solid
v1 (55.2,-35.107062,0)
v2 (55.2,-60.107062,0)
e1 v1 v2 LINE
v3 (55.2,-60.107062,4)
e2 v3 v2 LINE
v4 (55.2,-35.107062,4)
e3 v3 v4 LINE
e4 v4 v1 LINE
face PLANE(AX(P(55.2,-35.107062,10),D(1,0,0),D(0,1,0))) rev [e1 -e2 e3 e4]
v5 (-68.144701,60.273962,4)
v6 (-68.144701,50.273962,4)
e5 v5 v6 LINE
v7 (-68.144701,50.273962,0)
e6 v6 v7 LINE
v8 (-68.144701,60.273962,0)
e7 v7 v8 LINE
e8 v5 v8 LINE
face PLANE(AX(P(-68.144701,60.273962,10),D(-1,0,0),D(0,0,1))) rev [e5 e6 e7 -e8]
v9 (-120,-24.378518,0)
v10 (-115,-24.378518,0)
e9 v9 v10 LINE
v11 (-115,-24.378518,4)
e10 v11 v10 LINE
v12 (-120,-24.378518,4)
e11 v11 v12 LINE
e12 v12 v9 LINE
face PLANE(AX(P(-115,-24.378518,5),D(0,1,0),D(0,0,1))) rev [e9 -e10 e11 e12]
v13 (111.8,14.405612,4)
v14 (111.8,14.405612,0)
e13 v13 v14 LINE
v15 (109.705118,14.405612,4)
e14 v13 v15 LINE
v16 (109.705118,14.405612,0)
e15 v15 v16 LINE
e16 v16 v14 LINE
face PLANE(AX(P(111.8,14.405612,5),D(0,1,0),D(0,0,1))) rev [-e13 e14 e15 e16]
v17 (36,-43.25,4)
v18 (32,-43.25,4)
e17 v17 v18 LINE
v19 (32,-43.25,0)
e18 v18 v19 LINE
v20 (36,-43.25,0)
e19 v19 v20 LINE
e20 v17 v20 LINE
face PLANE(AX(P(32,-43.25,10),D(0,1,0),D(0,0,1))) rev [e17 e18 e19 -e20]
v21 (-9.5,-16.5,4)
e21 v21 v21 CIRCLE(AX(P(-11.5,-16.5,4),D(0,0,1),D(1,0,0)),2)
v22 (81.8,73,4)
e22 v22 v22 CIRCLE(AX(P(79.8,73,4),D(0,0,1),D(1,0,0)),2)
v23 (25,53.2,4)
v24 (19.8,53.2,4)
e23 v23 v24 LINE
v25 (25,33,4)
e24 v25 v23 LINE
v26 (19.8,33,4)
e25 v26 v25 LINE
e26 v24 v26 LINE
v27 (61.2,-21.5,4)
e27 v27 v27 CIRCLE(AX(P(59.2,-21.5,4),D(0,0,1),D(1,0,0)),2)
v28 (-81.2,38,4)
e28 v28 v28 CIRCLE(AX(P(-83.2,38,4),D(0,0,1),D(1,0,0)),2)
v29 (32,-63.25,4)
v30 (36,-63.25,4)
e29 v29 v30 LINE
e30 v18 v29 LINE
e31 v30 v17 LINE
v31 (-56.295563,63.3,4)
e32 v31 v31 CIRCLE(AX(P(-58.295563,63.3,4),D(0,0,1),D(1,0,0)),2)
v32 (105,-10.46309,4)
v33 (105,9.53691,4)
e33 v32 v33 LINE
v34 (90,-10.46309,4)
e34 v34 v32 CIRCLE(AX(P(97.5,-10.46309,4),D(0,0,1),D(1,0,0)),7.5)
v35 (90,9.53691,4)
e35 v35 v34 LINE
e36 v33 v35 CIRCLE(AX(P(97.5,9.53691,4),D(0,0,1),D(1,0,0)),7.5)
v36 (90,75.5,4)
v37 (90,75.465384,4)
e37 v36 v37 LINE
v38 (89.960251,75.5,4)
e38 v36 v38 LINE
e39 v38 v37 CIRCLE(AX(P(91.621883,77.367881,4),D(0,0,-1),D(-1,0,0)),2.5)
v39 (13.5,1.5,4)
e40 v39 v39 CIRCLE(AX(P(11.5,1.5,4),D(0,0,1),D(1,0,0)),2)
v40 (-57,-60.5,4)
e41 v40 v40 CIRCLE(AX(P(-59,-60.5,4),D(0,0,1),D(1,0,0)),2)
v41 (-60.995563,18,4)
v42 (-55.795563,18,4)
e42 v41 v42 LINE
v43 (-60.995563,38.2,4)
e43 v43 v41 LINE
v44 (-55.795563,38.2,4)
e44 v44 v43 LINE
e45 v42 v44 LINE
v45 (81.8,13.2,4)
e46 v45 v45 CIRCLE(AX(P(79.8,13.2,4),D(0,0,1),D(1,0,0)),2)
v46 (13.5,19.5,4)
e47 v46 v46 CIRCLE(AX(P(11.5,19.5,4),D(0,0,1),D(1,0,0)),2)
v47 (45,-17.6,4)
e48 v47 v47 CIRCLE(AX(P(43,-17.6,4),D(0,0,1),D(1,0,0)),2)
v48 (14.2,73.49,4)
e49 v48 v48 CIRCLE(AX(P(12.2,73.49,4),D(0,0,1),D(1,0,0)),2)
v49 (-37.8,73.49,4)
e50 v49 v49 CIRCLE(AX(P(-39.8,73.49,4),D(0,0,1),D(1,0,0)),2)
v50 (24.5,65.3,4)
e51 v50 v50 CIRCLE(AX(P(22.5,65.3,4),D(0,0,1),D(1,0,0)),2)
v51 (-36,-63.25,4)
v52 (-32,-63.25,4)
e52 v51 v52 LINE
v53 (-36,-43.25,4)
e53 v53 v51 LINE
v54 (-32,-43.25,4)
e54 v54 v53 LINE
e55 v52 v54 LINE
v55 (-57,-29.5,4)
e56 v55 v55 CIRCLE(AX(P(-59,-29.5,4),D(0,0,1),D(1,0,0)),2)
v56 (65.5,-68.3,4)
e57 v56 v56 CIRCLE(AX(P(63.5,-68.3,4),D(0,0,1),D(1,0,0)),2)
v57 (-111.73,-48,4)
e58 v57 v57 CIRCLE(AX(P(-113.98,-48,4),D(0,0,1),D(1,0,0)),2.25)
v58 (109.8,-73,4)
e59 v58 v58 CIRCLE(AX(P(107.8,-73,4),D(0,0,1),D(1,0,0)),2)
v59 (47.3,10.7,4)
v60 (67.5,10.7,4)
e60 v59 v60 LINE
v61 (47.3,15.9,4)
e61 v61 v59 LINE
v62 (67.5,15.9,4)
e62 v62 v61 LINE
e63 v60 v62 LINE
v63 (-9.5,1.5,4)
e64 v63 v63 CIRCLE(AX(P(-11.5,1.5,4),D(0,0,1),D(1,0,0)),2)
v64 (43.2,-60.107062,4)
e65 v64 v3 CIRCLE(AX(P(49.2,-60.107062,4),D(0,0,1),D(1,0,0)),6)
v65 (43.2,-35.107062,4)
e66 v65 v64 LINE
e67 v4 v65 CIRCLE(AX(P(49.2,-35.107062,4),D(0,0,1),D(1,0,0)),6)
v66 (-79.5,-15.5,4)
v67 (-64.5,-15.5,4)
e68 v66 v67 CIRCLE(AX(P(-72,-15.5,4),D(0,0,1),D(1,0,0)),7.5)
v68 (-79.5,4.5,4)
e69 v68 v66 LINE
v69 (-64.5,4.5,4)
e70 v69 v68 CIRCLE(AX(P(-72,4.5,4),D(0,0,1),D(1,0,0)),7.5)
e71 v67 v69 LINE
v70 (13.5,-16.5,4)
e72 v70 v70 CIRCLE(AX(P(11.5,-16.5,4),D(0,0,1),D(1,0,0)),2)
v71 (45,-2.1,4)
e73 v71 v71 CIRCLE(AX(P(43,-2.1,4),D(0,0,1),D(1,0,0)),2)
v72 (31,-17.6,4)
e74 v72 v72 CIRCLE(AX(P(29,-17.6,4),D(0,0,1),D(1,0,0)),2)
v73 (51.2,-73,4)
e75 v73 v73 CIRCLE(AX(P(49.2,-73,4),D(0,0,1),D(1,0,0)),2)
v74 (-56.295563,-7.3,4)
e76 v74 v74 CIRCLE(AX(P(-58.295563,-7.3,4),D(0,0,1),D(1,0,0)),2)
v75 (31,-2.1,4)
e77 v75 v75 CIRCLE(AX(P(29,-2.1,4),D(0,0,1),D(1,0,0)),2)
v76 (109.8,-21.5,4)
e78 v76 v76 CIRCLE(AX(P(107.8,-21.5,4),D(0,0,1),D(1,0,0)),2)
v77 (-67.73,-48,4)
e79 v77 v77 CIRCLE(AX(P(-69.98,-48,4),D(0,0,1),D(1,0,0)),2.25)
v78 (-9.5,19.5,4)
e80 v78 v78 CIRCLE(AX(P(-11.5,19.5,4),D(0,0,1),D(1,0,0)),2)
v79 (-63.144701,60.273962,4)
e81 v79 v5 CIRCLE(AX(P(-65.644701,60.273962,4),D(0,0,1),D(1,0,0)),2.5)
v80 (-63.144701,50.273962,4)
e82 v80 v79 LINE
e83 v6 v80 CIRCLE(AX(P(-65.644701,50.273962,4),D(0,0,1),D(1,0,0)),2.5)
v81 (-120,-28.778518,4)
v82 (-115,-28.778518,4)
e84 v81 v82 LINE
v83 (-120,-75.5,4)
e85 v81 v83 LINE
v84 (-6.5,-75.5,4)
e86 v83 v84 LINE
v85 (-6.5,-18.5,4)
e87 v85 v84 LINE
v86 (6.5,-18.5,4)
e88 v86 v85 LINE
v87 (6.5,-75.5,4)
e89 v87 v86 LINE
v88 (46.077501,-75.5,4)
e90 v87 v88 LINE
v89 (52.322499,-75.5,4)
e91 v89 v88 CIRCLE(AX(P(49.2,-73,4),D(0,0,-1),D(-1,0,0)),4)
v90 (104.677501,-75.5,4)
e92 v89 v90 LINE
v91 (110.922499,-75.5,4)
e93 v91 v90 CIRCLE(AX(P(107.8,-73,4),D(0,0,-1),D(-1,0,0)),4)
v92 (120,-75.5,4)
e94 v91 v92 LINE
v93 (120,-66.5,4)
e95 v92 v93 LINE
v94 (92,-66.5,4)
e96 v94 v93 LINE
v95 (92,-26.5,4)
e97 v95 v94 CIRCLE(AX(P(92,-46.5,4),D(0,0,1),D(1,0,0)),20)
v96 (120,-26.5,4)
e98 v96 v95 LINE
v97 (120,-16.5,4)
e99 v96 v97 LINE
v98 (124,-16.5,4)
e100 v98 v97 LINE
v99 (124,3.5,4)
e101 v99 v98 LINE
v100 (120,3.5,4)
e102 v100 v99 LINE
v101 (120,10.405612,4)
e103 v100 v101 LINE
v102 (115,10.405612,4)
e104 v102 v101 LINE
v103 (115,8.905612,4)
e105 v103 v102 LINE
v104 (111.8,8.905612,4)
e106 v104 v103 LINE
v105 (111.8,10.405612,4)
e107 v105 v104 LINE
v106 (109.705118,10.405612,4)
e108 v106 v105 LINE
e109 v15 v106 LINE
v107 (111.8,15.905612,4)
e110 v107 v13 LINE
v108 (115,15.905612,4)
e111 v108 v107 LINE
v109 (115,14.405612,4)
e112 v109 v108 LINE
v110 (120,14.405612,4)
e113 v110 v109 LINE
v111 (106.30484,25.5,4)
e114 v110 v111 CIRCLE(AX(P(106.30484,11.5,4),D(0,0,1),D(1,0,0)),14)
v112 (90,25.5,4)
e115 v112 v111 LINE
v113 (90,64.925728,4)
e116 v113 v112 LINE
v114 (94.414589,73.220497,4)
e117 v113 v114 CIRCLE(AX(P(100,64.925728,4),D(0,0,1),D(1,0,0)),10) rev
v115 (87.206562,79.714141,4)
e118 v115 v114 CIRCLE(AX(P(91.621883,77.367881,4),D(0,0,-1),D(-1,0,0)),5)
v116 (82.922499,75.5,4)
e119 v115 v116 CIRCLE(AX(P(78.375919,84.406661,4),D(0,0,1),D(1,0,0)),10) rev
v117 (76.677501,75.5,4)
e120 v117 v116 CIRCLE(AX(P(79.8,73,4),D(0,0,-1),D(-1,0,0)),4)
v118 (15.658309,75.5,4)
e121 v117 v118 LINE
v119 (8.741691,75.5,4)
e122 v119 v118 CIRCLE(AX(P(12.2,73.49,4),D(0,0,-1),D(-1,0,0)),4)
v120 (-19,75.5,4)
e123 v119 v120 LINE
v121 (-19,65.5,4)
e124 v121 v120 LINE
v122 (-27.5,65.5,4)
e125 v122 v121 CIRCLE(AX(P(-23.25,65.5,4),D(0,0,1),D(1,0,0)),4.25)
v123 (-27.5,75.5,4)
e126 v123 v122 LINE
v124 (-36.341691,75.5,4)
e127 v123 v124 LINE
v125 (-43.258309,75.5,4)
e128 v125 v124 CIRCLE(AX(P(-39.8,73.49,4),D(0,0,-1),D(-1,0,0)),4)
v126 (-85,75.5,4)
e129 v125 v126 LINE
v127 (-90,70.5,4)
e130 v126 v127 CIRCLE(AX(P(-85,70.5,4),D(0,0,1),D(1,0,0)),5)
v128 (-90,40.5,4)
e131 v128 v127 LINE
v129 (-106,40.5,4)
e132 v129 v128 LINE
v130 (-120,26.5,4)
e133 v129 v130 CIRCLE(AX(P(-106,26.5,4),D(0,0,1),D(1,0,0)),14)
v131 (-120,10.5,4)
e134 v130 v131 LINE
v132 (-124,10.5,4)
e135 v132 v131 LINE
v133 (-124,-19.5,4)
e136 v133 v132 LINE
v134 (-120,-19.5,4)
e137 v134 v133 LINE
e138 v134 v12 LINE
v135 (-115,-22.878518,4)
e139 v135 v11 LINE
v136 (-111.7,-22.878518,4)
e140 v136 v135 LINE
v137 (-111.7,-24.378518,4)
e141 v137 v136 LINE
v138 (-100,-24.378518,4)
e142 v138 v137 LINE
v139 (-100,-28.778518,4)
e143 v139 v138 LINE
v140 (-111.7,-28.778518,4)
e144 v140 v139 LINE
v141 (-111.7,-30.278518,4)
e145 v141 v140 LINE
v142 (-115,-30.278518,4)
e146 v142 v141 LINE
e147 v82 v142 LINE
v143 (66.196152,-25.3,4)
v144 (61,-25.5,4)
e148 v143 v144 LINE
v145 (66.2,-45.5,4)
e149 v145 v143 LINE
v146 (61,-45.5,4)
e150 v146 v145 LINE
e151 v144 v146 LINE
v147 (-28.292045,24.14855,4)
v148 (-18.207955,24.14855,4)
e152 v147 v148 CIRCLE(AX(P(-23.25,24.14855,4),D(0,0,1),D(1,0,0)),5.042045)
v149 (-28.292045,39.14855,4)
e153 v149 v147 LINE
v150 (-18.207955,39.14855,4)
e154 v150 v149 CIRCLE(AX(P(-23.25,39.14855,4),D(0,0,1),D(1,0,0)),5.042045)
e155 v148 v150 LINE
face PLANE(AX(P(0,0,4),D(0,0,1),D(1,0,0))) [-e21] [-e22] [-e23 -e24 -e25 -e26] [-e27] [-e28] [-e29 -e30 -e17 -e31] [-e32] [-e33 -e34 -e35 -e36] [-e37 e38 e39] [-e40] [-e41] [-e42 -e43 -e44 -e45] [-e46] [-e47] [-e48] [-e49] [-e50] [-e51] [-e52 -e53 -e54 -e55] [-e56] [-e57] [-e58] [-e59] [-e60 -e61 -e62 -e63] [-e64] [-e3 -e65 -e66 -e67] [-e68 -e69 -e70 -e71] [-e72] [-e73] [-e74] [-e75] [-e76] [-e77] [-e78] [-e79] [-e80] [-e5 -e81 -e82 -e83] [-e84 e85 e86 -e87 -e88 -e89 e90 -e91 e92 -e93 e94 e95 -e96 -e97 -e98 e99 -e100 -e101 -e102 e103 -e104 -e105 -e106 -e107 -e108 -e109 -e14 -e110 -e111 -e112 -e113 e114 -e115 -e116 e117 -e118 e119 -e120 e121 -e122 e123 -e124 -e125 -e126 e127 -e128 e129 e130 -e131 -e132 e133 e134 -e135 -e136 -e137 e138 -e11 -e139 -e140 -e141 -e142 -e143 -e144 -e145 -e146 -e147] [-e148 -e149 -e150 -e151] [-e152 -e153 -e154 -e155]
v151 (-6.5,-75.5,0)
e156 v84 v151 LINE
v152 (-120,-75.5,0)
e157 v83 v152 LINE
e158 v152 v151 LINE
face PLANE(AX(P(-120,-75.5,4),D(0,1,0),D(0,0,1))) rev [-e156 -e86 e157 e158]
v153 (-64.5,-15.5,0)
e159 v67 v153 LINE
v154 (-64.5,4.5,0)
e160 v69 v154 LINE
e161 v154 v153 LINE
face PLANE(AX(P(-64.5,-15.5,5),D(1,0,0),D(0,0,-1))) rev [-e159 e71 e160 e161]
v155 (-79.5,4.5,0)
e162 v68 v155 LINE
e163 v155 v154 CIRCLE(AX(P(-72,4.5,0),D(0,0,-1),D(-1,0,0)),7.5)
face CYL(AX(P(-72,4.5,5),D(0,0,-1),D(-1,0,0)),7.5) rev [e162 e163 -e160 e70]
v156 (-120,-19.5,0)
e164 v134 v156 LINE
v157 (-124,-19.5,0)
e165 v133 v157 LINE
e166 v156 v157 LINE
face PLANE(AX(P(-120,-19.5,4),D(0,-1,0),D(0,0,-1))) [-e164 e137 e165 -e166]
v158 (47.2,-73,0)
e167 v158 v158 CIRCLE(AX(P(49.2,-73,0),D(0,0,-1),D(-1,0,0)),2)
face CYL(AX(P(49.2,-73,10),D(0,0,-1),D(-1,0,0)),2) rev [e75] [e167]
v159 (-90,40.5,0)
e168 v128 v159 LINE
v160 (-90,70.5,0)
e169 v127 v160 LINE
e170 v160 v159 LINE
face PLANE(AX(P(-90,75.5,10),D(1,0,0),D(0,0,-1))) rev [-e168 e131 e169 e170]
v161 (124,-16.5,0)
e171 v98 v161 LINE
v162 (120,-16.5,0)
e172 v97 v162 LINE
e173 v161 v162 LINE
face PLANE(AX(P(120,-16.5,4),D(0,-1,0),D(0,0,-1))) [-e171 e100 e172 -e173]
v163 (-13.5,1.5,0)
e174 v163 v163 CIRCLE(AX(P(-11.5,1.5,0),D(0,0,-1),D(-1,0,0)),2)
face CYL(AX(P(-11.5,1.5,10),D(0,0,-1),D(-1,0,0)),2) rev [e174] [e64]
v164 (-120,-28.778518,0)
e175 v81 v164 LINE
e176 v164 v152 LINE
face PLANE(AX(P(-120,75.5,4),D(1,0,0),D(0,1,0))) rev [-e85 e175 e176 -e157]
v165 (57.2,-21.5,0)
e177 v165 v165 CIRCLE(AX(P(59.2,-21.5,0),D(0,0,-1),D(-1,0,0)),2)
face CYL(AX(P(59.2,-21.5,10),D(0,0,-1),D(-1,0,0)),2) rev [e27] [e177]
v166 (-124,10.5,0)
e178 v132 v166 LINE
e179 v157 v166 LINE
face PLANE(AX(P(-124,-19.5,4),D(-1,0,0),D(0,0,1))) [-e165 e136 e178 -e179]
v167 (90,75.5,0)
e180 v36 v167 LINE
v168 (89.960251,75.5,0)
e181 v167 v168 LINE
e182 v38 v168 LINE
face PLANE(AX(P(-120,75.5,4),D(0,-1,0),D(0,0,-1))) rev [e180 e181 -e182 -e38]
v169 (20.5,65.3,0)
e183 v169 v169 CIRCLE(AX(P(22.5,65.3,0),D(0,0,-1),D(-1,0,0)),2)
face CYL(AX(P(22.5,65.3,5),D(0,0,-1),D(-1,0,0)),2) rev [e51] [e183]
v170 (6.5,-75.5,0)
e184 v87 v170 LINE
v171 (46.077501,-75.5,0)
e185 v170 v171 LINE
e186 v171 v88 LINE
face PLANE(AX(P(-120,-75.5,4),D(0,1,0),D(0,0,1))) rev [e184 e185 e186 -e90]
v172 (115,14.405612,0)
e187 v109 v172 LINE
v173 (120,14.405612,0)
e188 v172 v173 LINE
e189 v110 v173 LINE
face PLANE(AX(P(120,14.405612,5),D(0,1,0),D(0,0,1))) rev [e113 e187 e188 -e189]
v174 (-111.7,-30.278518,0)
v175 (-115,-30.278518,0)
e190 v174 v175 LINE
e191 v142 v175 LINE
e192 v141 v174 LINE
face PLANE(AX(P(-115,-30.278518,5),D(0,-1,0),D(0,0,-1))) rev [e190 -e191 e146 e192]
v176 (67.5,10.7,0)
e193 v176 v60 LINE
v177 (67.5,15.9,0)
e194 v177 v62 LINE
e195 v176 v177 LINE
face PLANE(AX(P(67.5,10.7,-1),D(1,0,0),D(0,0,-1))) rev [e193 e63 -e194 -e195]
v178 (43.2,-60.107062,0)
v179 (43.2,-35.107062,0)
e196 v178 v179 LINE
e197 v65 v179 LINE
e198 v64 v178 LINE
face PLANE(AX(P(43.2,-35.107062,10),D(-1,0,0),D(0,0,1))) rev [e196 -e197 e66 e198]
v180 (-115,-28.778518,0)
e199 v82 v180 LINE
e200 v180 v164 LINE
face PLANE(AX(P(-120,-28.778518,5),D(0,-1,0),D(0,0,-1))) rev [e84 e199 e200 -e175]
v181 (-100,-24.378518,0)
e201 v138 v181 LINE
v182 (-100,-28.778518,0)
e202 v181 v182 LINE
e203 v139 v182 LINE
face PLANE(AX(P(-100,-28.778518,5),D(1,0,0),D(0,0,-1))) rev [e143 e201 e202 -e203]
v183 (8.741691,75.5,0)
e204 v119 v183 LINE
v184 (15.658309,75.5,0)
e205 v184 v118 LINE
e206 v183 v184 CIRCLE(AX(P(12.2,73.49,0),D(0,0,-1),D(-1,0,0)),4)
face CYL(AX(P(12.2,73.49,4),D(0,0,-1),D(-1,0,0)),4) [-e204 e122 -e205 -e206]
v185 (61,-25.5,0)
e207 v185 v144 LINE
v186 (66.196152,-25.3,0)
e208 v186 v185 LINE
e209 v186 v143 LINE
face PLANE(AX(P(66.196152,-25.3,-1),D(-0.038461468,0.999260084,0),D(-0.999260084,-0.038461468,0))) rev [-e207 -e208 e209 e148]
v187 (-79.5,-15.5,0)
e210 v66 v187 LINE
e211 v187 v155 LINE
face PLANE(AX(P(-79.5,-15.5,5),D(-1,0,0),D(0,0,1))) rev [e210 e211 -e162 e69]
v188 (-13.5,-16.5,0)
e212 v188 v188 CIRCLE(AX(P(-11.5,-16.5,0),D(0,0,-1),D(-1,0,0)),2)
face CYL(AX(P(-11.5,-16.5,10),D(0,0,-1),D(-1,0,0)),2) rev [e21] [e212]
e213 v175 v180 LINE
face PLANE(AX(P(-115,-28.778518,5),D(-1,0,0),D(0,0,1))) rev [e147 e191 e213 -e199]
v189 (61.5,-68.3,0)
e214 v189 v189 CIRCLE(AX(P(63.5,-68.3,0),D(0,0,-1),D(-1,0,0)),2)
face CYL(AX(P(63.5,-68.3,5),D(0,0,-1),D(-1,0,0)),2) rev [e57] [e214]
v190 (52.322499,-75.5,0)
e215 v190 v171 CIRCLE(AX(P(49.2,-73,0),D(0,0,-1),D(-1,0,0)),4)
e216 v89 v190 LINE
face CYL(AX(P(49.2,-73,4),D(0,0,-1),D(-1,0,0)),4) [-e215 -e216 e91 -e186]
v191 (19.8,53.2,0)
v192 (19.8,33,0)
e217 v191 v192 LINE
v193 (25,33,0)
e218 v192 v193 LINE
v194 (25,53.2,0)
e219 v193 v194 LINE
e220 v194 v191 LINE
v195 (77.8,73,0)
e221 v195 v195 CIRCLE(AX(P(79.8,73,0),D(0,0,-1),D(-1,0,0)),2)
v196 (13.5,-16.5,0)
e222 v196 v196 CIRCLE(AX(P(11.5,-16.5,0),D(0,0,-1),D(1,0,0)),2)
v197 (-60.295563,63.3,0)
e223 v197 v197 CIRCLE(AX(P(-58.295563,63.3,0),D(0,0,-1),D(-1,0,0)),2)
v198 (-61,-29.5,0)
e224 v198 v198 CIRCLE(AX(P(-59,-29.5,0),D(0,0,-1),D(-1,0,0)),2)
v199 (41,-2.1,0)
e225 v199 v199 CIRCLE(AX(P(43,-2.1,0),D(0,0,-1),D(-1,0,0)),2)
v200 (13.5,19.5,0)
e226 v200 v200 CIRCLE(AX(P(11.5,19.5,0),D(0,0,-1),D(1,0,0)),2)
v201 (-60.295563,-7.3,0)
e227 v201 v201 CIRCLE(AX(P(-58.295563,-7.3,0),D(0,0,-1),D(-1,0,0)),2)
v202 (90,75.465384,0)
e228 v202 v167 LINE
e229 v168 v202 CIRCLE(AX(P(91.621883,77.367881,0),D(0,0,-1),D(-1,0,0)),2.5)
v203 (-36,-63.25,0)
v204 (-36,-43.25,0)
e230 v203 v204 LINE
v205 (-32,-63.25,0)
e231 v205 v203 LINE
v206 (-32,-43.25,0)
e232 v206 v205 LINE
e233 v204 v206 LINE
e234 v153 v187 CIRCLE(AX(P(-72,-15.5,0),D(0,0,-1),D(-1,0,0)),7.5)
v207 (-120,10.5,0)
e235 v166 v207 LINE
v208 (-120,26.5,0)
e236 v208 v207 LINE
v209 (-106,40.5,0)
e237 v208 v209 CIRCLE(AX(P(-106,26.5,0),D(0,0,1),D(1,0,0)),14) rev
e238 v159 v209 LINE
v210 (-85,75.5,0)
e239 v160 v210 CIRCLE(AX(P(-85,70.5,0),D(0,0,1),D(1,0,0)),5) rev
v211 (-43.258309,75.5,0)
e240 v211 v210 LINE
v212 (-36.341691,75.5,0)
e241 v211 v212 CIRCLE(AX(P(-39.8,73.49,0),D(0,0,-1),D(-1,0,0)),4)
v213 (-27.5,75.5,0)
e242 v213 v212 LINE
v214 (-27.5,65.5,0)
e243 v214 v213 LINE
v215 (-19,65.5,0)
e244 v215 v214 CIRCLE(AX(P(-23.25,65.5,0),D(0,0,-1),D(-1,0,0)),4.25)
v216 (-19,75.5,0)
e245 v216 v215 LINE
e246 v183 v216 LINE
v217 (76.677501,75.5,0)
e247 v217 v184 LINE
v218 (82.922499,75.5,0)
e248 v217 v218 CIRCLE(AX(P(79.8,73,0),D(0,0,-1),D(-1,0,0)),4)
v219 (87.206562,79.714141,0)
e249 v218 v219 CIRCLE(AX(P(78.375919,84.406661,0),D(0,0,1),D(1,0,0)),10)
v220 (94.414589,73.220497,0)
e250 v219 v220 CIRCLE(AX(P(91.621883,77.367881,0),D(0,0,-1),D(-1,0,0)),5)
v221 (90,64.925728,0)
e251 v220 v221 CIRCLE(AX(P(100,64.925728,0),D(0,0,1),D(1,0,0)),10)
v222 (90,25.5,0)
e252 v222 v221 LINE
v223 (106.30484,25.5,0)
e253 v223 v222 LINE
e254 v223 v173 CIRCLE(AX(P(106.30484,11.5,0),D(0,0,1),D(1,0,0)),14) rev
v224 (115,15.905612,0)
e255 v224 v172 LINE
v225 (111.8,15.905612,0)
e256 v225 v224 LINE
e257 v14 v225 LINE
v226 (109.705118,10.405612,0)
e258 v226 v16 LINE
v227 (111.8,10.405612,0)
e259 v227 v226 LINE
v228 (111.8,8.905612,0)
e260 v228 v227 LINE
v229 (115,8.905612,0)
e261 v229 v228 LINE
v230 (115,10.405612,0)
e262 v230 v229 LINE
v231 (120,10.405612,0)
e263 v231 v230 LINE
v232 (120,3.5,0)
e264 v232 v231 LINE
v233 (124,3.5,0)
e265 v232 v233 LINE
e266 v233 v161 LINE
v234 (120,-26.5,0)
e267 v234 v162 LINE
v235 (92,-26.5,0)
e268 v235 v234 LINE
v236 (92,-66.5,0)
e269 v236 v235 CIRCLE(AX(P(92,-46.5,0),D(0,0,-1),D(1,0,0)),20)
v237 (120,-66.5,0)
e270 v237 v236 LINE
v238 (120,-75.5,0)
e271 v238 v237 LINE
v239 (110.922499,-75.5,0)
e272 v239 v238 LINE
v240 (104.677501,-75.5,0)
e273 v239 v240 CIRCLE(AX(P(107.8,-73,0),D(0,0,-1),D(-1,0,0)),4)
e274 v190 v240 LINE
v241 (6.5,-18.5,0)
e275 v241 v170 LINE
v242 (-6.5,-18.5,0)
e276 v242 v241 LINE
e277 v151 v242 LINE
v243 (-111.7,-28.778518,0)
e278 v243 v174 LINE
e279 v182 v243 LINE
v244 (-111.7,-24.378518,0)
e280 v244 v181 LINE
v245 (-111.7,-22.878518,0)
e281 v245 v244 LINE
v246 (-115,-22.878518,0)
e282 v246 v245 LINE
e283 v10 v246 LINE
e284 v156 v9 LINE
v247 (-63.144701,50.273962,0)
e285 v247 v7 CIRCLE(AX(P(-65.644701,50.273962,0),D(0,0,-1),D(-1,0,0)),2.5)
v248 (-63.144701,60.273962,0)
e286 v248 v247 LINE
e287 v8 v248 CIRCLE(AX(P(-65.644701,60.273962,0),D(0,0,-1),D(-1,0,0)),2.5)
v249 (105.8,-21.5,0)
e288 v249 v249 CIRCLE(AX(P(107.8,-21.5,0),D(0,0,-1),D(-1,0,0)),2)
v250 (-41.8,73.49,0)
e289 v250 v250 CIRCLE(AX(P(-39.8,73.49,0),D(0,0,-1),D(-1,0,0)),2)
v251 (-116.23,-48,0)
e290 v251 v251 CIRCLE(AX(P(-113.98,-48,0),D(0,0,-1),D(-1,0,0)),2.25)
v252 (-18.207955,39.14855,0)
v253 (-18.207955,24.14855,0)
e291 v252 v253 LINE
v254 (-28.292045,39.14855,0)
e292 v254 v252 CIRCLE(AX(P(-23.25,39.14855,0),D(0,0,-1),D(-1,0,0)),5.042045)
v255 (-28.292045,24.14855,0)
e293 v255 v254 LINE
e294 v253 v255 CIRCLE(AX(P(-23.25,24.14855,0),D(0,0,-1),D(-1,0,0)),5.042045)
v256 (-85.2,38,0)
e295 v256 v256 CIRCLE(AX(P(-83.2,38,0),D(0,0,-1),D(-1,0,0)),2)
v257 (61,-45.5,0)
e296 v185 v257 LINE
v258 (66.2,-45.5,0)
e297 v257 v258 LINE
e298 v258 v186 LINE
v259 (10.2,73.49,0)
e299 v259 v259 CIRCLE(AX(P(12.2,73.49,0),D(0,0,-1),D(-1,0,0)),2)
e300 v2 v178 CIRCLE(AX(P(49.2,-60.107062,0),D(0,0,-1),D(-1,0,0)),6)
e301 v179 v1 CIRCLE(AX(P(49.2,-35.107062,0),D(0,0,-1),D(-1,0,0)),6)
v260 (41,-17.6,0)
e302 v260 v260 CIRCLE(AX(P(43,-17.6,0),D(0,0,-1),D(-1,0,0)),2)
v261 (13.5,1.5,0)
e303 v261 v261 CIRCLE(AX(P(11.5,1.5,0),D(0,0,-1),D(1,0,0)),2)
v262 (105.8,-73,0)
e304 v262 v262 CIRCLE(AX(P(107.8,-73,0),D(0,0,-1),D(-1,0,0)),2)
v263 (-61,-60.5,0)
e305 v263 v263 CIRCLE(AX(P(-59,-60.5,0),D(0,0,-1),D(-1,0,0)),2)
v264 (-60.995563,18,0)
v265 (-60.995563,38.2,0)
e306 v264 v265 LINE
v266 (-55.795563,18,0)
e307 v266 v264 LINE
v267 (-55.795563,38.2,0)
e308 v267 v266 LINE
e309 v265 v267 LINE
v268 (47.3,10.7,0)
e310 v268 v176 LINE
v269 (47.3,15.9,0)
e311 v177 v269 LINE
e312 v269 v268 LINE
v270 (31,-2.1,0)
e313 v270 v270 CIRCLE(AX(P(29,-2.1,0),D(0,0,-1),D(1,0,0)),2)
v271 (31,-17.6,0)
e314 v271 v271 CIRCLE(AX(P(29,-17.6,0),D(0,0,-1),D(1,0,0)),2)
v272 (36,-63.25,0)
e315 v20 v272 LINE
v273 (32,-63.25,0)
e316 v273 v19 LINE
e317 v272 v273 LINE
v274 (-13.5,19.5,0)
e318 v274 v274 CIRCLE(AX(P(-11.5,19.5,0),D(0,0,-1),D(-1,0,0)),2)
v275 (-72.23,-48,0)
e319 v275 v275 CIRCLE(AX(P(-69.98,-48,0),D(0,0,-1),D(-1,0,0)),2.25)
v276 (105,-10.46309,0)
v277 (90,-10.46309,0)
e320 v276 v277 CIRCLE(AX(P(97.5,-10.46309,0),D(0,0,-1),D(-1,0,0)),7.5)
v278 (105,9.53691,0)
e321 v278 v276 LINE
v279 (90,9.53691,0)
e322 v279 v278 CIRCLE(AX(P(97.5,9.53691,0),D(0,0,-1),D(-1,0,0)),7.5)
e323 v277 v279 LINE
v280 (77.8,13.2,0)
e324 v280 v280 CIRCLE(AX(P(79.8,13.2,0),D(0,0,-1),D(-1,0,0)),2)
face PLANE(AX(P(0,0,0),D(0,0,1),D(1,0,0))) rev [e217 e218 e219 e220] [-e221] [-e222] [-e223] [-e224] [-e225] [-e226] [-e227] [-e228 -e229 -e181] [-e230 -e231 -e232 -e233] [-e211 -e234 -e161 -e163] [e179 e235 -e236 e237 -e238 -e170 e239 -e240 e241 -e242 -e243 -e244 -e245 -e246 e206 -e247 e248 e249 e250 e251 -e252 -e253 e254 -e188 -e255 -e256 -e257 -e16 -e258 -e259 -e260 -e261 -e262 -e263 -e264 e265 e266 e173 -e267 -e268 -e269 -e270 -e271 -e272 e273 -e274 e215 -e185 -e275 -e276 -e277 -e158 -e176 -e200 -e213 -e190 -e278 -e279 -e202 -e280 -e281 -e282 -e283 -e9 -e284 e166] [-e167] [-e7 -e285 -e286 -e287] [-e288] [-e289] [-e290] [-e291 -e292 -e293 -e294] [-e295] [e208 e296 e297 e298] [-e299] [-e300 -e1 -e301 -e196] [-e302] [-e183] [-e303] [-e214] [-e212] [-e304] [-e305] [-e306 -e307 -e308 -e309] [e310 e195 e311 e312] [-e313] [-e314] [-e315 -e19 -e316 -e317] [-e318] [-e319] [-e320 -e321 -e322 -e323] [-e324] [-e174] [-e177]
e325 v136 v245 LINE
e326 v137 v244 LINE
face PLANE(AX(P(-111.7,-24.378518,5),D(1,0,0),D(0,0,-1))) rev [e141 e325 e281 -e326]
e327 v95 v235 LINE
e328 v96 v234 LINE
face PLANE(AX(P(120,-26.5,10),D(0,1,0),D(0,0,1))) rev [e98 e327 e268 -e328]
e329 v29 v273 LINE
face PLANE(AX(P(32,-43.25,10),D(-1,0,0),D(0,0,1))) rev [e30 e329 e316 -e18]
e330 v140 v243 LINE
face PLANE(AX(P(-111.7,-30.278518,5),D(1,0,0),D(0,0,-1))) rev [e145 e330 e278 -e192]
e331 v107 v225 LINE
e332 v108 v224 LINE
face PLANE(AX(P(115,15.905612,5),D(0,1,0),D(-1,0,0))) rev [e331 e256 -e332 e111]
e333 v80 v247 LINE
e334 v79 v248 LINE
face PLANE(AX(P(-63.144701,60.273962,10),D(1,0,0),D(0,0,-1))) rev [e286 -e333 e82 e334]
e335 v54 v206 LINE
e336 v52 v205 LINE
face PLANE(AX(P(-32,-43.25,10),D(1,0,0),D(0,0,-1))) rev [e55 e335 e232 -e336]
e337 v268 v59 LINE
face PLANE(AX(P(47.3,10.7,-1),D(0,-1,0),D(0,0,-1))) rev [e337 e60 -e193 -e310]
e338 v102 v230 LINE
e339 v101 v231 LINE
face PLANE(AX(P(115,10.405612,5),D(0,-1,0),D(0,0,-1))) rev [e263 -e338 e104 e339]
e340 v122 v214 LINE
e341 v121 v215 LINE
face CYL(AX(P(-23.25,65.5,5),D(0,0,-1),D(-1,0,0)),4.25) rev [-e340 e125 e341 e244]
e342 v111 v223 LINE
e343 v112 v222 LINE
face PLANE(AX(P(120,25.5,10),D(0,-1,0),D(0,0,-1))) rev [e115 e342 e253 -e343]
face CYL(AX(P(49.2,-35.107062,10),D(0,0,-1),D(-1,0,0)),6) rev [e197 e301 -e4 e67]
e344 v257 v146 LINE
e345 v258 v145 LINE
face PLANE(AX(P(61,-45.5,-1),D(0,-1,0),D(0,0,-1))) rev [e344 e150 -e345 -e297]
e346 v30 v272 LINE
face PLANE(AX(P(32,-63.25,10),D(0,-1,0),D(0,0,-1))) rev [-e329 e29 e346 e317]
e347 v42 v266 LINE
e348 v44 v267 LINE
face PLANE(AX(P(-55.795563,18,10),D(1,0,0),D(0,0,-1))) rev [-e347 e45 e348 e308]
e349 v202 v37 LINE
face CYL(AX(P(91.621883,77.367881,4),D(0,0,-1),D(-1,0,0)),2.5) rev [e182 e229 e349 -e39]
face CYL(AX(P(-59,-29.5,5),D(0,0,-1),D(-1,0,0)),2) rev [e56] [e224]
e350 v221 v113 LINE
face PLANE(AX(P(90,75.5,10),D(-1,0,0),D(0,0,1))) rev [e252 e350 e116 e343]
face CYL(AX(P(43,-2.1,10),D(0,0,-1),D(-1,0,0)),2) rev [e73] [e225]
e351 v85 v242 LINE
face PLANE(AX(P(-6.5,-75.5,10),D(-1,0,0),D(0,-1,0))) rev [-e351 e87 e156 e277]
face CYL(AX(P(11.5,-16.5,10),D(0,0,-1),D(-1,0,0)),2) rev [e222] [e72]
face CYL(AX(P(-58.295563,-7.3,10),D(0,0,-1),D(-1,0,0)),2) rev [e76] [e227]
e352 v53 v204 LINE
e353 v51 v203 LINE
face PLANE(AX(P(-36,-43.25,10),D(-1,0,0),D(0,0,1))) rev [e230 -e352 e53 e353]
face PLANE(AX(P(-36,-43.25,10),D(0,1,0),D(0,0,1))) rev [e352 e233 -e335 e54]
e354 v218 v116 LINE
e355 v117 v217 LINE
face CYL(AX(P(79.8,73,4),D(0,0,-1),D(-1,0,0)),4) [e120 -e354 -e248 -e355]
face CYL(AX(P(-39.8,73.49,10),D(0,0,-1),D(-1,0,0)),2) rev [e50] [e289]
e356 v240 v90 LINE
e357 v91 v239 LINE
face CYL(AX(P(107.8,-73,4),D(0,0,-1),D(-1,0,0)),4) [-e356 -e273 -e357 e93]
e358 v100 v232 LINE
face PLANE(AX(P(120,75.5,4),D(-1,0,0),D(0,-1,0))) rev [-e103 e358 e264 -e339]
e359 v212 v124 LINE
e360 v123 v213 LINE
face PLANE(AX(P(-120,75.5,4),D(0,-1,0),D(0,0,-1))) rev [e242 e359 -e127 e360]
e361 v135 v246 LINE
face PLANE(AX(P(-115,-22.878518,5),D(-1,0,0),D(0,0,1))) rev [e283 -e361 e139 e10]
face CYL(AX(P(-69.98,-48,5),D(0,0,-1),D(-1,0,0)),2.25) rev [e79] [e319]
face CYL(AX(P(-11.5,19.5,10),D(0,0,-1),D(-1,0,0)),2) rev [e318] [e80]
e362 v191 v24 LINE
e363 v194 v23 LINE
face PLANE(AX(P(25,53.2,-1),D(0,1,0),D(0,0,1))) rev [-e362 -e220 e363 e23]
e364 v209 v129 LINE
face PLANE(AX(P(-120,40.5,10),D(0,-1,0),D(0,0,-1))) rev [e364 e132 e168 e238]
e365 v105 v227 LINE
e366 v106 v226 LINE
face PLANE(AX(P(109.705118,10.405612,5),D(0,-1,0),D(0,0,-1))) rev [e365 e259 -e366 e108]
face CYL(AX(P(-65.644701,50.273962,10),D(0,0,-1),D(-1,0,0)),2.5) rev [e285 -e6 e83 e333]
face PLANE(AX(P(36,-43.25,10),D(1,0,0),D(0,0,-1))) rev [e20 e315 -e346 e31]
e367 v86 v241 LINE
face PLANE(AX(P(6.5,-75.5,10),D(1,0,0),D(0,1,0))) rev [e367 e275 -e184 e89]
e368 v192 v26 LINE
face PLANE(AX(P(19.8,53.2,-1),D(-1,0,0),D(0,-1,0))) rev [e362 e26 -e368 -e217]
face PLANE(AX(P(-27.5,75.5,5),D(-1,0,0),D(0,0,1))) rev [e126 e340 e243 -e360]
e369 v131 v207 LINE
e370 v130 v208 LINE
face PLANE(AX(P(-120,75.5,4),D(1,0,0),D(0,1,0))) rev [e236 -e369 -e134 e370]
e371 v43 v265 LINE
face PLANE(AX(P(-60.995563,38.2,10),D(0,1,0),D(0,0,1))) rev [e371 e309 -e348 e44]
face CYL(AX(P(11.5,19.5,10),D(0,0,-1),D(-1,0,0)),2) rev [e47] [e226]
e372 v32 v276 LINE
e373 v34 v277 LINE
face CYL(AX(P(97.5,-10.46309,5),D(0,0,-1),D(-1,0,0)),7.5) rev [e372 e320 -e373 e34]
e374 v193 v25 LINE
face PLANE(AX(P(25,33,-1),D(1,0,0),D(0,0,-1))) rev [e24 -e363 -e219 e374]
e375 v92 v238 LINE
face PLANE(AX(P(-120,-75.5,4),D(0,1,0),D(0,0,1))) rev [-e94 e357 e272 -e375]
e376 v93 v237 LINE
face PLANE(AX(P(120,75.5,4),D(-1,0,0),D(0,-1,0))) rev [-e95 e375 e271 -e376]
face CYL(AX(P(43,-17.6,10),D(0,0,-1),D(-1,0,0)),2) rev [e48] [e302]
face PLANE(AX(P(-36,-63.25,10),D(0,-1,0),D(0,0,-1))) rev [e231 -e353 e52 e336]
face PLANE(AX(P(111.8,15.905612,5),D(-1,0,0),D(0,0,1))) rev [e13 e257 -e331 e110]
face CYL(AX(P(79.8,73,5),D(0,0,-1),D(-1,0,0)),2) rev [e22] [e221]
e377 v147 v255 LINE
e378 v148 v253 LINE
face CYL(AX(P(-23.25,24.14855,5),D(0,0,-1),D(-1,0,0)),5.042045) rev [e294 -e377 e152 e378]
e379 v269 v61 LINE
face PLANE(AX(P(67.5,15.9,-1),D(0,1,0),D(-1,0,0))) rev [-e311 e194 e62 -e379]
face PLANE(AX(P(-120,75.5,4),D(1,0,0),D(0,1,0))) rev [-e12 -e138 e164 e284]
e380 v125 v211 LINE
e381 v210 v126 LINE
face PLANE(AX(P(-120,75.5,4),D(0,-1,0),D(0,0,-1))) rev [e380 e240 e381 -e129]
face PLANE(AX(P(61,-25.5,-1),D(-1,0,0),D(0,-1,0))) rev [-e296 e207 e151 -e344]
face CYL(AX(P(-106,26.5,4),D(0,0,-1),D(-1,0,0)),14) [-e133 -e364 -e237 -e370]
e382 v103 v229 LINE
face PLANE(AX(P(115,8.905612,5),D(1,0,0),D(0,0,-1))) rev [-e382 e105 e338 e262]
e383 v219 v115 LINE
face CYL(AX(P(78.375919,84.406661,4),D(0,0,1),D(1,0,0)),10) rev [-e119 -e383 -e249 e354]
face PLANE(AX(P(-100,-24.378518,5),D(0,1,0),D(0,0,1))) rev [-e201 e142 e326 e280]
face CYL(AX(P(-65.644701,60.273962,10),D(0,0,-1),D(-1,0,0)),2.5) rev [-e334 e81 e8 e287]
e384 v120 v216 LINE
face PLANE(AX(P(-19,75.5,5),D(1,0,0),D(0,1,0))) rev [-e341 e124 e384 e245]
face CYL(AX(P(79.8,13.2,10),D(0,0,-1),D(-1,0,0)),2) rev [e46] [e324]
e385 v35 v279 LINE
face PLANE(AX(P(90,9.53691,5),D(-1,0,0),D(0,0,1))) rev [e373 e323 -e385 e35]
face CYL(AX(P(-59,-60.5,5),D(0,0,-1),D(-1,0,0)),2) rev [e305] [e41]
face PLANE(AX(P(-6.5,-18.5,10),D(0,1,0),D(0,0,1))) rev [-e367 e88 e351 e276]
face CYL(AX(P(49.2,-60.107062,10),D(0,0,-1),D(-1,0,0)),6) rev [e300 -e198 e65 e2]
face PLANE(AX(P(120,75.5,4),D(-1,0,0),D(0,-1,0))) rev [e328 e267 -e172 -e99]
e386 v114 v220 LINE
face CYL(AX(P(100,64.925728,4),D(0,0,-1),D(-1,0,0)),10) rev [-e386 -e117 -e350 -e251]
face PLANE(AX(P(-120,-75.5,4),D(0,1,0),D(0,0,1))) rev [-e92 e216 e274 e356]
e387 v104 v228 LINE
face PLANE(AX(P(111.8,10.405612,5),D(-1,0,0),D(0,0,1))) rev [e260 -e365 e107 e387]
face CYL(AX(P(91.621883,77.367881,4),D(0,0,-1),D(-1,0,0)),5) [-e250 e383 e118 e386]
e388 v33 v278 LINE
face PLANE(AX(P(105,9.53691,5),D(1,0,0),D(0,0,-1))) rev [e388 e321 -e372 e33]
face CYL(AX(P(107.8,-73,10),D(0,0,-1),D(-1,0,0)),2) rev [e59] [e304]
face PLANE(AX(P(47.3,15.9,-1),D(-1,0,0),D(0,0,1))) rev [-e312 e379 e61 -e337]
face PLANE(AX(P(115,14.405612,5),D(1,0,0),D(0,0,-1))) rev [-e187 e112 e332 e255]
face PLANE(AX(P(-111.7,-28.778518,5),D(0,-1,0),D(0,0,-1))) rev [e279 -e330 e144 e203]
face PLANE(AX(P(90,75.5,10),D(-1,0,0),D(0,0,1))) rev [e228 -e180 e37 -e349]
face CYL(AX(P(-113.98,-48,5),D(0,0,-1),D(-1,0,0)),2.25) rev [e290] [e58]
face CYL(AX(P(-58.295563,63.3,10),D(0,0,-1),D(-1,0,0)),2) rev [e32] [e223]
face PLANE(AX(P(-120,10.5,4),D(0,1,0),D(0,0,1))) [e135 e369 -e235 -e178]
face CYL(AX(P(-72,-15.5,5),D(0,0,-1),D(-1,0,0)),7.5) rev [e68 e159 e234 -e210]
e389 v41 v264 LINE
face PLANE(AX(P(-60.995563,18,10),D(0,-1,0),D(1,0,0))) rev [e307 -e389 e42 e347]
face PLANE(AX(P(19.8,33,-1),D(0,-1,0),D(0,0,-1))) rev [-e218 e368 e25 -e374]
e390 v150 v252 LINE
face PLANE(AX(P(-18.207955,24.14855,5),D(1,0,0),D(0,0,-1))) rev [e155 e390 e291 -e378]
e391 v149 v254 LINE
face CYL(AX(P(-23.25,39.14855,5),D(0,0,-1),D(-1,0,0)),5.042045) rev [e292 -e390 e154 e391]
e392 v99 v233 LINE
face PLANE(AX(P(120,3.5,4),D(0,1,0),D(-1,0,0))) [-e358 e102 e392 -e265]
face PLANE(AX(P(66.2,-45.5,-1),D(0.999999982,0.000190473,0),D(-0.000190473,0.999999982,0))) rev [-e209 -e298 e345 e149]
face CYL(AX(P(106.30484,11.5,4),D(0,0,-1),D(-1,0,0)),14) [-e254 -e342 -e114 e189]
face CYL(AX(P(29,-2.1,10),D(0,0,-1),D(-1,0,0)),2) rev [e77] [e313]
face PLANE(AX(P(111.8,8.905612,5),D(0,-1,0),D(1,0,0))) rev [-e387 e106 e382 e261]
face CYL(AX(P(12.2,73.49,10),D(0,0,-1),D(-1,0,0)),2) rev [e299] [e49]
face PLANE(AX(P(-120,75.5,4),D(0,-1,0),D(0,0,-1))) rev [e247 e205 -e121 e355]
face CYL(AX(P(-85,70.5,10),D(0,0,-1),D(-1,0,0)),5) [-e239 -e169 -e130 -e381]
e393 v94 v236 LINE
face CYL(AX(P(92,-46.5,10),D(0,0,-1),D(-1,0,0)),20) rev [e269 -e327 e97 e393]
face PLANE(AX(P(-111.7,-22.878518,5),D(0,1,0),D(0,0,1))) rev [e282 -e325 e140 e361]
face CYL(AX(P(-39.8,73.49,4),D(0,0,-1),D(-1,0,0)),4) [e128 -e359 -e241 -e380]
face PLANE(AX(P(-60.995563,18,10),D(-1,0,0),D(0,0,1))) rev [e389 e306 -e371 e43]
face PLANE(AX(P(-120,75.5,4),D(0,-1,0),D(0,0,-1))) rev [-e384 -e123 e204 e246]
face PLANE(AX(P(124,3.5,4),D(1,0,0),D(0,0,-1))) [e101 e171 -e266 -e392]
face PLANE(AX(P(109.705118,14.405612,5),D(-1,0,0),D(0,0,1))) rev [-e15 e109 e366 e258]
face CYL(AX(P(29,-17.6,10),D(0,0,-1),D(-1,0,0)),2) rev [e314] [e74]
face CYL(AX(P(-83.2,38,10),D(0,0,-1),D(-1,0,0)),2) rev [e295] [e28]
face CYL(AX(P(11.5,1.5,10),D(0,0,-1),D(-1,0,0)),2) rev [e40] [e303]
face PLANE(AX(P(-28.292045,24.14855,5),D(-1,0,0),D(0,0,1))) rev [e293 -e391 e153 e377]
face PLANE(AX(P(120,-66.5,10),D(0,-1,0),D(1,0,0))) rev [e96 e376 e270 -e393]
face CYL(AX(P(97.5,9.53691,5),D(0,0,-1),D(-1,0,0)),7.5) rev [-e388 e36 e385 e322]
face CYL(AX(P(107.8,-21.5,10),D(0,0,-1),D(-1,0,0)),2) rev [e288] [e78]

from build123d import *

# Parameters (mm, degrees)
SKETCH1_W           = 240
SKETCH1_H           = 151
BOSS_EXTRUDE1_DEPTH = 4
SKETCH3_W           = 13
SKETCH3_H           = 57
CUT_EXTRUDE2_DEPTH  = 10
SKETCH6_R           = 2
CUT_EXTRUDE5_DEPTH  = 10
SKETCH7_R           = 2
CUT_EXTRUDE6_DEPTH  = 10
CUT_EXTRUDE7_DEPTH  = 10
SKETCH9_R           = 2
CUT_EXTRUDE8_DEPTH  = 10
SKETCH10_R          = 4
SKETCH10_R_2        = 2
BOSS_EXTRUDE2_DEPTH = 4
CUT_EXTRUDE10_DEPTH = 10
SKETCH13_W          = 30
SKETCH13_H          = 35
CUT_EXTRUDE11_DEPTH = 10
SKETCH16_R          = 2
CUT_EXTRUDE13_DEPTH = 5
CUT_EXTRUDE14_DEPTH = 5
CUT_EXTRUDE15_DEPTH = 5
SKETCH20_W          = 5.2
SKETCH20_H          = 20.2
CUT_EXTRUDE17_DEPTH = 10
SKETCH21_R          = 2
CUT_EXTRUDE18_DEPTH = 10
CUT_EXTRUDE20_DEPTH = 5
SKETCH25_R          = 2
CUT_EXTRUDE21_DEPTH = 5
SKETCH26_R          = 2
CUT_EXTRUDE22_DEPTH = 10
SKETCH27_R          = 4
SKETCH27_R_2        = 2
BOSS_EXTRUDE4_DEPTH = 4
SKETCH28_W          = 5.2
SKETCH28_H          = 20.2
CUT_EXTRUDE23_DEPTH = 5
SKETCH29_W          = 20.2
SKETCH29_H          = 5.2
CUT_EXTRUDE24_DEPTH = 5
SKETCH30_R          = 2
CUT_EXTRUDE25_DEPTH = 5
SKETCH31_R          = 4
SKETCH31_R_2        = 2
BOSS_EXTRUDE5_DEPTH = 4
SKETCH33_W          = 4
SKETCH33_H          = 30
SKETCH33_H_2        = 20
BOSS_EXTRUDE6_DEPTH = 4
SKETCH34_R          = 2.25
CUT_EXTRUDE27_DEPTH = 5
CUT_EXTRUDE28_DEPTH = 5
SKETCH36_R          = 2
CUT_EXTRUDE29_DEPTH = 5
SKETCH37_R          = 2
CUT_EXTRUDE30_DEPTH = 10
SKETCH38_R          = 2
CUT_EXTRUDE31_DEPTH = 10
CUT_EXTRUDE32_DEPTH = 10
FILLET2_R           = 5
SKETCH41_R          = 5
SKETCH41_R_2        = 2.5
BOSS_EXTRUDE7_DEPTH = 4
FILLET3_R           = 10
CUT_EXTRUDE34_DEPTH = 5
FILLET4_R           = 14
SKETCH44_W          = 30
SKETCH44_H          = 15
CUT_EXTRUDE35_DEPTH = 10
FILLET5_R           = 14
SKETCH46_W          = 4
SKETCH46_H          = 20
CUT_EXTRUDE37_DEPTH = 10


with BuildPart() as part:
    # Sketch1 → Boss-Extrude1 (new body)
    with BuildSketch(Plane.XY):
        Rectangle(SKETCH1_W, SKETCH1_H)
    extrude(amount=BOSS_EXTRUDE1_DEPTH)

    # Sketch3 → Cut-Extrude2 (cut)
    with BuildSketch(Plane(origin=(0, 0, 0), x_dir=(-1, 0, 0), z_dir=(0, 0, -1))):
        with Locations((0, -47)):
            Rectangle(SKETCH3_W, SKETCH3_H)
    extrude(amount=-CUT_EXTRUDE2_DEPTH, mode=Mode.SUBTRACT)

    # Sketch6 → Cut-Extrude5 (cut)
    with BuildSketch(Plane(origin=(0, 0, 0), x_dir=(-1, 0, 0), z_dir=(0, 0, -1))):
        with Locations((11.5, 19.5)):
            Circle(SKETCH6_R)
        with Locations((11.5, 1.5)):
            Circle(SKETCH6_R)
        with Locations((11.5, -16.5)):
            Circle(SKETCH6_R)
        with Locations(Location((-11.5, -16.5, 0), (0, 0, 180))):
            Circle(SKETCH6_R)
        with Locations(Location((-11.5, 1.5, 0), (0, 0, 180))):
            Circle(SKETCH6_R)
        with Locations(Location((-11.5, 19.5, 0), (0, 0, 180))):
            Circle(SKETCH6_R)
    extrude(amount=-CUT_EXTRUDE5_DEPTH, mode=Mode.SUBTRACT)

    # Sketch7 → Cut-Extrude6 (cut)
    with BuildSketch(Plane(origin=(0, 0, 0), x_dir=(-1, 0, 0), z_dir=(0, 0, -1))):
        with Locations((-43, -2.1)):
            Circle(SKETCH7_R)
        with Locations((-43, -17.6)):
            Circle(SKETCH7_R)
        with Locations(Location((-29, -17.6, 0), (0, 0, 180))):
            Circle(SKETCH7_R)
        with Locations(Location((-29, -2.1, 0), (0, 0, 180))):
            Circle(SKETCH7_R)
    extrude(amount=-CUT_EXTRUDE6_DEPTH, mode=Mode.SUBTRACT)

    # Sketch8 → Cut-Extrude7 (cut)
    with BuildSketch(Plane(origin=(0, 0, 0), x_dir=(-1, 0, 0), z_dir=(0, 0, -1))):
        with BuildLine():
            Line((-120, -26.5), (-92, -26.5))
            ThreePointArc((-92, -26.5), (-72, -46.5), (-92, -66.5))
            Line((-92, -66.5), (-120, -66.5))
            Line((-120, -66.5), (-120, -26.5))
        make_face()
    extrude(amount=-CUT_EXTRUDE7_DEPTH, mode=Mode.SUBTRACT)

    # Sketch9 → Cut-Extrude8 (cut)
    with BuildSketch(Plane(origin=(0, 0, 0), x_dir=(-1, 0, 0), z_dir=(0, 0, -1))):
        with Locations((-59.2, -21.5)):
            Circle(SKETCH9_R)
        with Locations((-107.8, -21.5)):
            Circle(SKETCH9_R)
        with Locations((-49.2, -73)):
            Circle(SKETCH9_R)
        with Locations((-107.8, -73)):
            Circle(SKETCH9_R)
    extrude(amount=-CUT_EXTRUDE8_DEPTH, mode=Mode.SUBTRACT)

    # Sketch10 → Boss-Extrude2 (add)
    # profile 1 of 2: a face of its own
    with BuildSketch(Plane(origin=(0, 0, 0), x_dir=(-1, 0, 0), z_dir=(0, 0, -1))):
        with Locations((-107.8, -73)):
            Circle(SKETCH10_R)
        with Locations((-107.8, -73)):
            Circle(SKETCH10_R_2, mode=Mode.SUBTRACT)
    # profile 2 of 2: a face of its own
    with BuildSketch(Plane(origin=(0, 0, 0), x_dir=(-1, 0, 0), z_dir=(0, 0, -1))):
        with Locations((-49.2, -73)):
            Circle(SKETCH10_R)
        with Locations((-49.2, -73)):
            Circle(SKETCH10_R_2, mode=Mode.SUBTRACT)
    extrude(amount=-BOSS_EXTRUDE2_DEPTH)

    # Sketch12 → Cut-Extrude10 (cut)
    with BuildSketch(Plane(origin=(0, 0, 0), x_dir=(-1, 0, 0), z_dir=(0, 0, -1))):
        with BuildLine():
            Line((-43.2, -35.107061825), (-43.2, -60.107061825))
            ThreePointArc((-43.2, -60.107061825), (-49.2, -66.107061825), (-55.2, -60.107061825))
            Line((-55.2, -60.107061825), (-55.2, -35.107061825))
            ThreePointArc((-55.2, -35.107061825), (-49.2, -29.107061825), (-43.2, -35.107061825))
        make_face()
    extrude(amount=-CUT_EXTRUDE10_DEPTH, mode=Mode.SUBTRACT)

    # Sketch13 → Cut-Extrude11 (cut)
    with BuildSketch(Plane(origin=(0, 0, 0), x_dir=(-1, 0, 0), z_dir=(0, 0, -1))):
        with Locations((-105, 58)):
            Rectangle(SKETCH13_W, SKETCH13_H)
        with Locations((105, 58)):
            Rectangle(SKETCH13_W, SKETCH13_H)
    extrude(amount=-CUT_EXTRUDE11_DEPTH, mode=Mode.SUBTRACT)

    # Sketch16 → Cut-Extrude13 (cut)
    with BuildSketch(Plane(origin=(0, 0, 0), x_dir=(-1, 0, 0), z_dir=(0, 0, -1))):
        with Locations((59, -29.5)):
            Circle(SKETCH16_R)
        with Locations((59, -60.5)):
            Circle(SKETCH16_R)
    extrude(amount=-CUT_EXTRUDE13_DEPTH, mode=Mode.SUBTRACT)

    # Sketch17 → Cut-Extrude14 (cut)
    with BuildSketch(Plane(origin=(0, 0, 0), x_dir=(-1, 0, 0), z_dir=(0, 0, -1))):
        with BuildLine():
            Line((-90, 9.536909767), (-90, -10.463090233))
            ThreePointArc((-90, -10.463090233), (-97.5, -17.963090233), (-105, -10.463090233))
            Line((-105, -10.463090233), (-105, 9.536909767))
            ThreePointArc((-105, 9.536909767), (-97.5, 17.036909767), (-90, 9.536909767))
        make_face()
    extrude(amount=-CUT_EXTRUDE14_DEPTH, mode=Mode.SUBTRACT)

    # Sketch18 → Cut-Extrude15 (cut)
    with BuildSketch(Plane(origin=(0, 0, 0), x_dir=(-1, 0, 0), z_dir=(0, 0, -1))):
        with BuildLine():
            Line((64.5, -15.5), (64.5, 4.5))
            ThreePointArc((64.5, 4.5), (72, 12), (79.5, 4.5))
            Line((79.5, 4.5), (79.5, -15.5))
            ThreePointArc((79.5, -15.5), (72, -23), (64.5, -15.5))
        make_face()
    extrude(amount=-CUT_EXTRUDE15_DEPTH, mode=Mode.SUBTRACT)

    # Sketch20 → Cut-Extrude17 (cut)
    with BuildSketch(Plane(origin=(0, 0, 0), x_dir=(-1, 0, 0), z_dir=(0, 0, -1))):
        with Locations((58.395562695, 28.1)):
            Rectangle(SKETCH20_W, SKETCH20_H)
    extrude(amount=-CUT_EXTRUDE17_DEPTH, mode=Mode.SUBTRACT)

    # Sketch21 → Cut-Extrude18 (cut)
    with BuildSketch(Plane(origin=(0, 0, 0), x_dir=(-1, 0, 0), z_dir=(0, 0, -1))):
        with Locations((58.295562695, -7.3)):
            Circle(SKETCH21_R)
        with Locations((58.295562695, 63.3)):
            Circle(SKETCH21_R)
    extrude(amount=-CUT_EXTRUDE18_DEPTH, mode=Mode.SUBTRACT)

    # Sketch24 → Cut-Extrude20 (cut)
    with BuildSketch(Plane.XY.offset(4)):
        Polygon((66.2, -45.5), (66.196152437, -25.300000366), (61, -25.5), (61, -45.5), align=None)
    extrude(amount=-CUT_EXTRUDE20_DEPTH, mode=Mode.SUBTRACT)

    # Sketch25 → Cut-Extrude21 (cut)
    with BuildSketch(Plane(origin=(0, 0, 0), x_dir=(-1, 0, 0), z_dir=(0, 0, -1))):
        with Locations((-63.5, -68.3)):
            Circle(SKETCH25_R)
    extrude(amount=-CUT_EXTRUDE21_DEPTH, mode=Mode.SUBTRACT)

    # Sketch26 → Cut-Extrude22 (cut)
    with BuildSketch(Plane(origin=(0, 0, 0), x_dir=(-1, 0, 0), z_dir=(0, 0, -1))):
        with Locations((39.8, 73.49)):
            Circle(SKETCH26_R)
        with Locations((-12.2, 73.49)):
            Circle(SKETCH26_R)
    extrude(amount=-CUT_EXTRUDE22_DEPTH, mode=Mode.SUBTRACT)

    # Sketch27 → Boss-Extrude4 (add)
    # profile 1 of 2: a face of its own
    with BuildSketch(Plane(origin=(0, 0, 0), x_dir=(-1, 0, 0), z_dir=(0, 0, -1))):
        with Locations((39.8, 73.49)):
            Circle(SKETCH27_R)
        with Locations((39.8, 73.49)):
            Circle(SKETCH27_R_2, mode=Mode.SUBTRACT)
    # profile 2 of 2: a face of its own
    with BuildSketch(Plane(origin=(0, 0, 0), x_dir=(-1, 0, 0), z_dir=(0, 0, -1))):
        with Locations((-12.2, 73.49)):
            Circle(SKETCH27_R)
        with Locations((-12.2, 73.49)):
            Circle(SKETCH27_R_2, mode=Mode.SUBTRACT)
    extrude(amount=-BOSS_EXTRUDE4_DEPTH)

    # Sketch28 → Cut-Extrude23 (cut)
    with BuildSketch(Plane.XY.offset(4)):
        with Locations((22.4, 43.1)):
            Rectangle(SKETCH28_W, SKETCH28_H)
    extrude(amount=-CUT_EXTRUDE23_DEPTH, mode=Mode.SUBTRACT)

    # Sketch29 → Cut-Extrude24 (cut)
    with BuildSketch(Plane.XY.offset(4)):
        with Locations((57.4, 13.3)):
            Rectangle(SKETCH29_W, SKETCH29_H)
    extrude(amount=-CUT_EXTRUDE24_DEPTH, mode=Mode.SUBTRACT)

    # Sketch30 → Cut-Extrude25 (cut)
    with BuildSketch(Plane(origin=(0, 0, 0), x_dir=(-1, 0, 0), z_dir=(0, 0, -1))):
        with Locations((-79.8, 73)):
            Circle(SKETCH30_R)
    extrude(amount=-CUT_EXTRUDE25_DEPTH, mode=Mode.SUBTRACT)

    # Sketch31 → Boss-Extrude5 (add)
    with BuildSketch(Plane(origin=(0, 0, 0), x_dir=(-1, 0, 0), z_dir=(0, 0, -1))):
        with Locations((-79.8, 73)):
            Circle(SKETCH31_R)
        with Locations((-79.8, 73)):
            Circle(SKETCH31_R_2, mode=Mode.SUBTRACT)
    extrude(amount=-BOSS_EXTRUDE5_DEPTH)

    # Sketch33 → Boss-Extrude6 (add)
    with BuildSketch(Plane(origin=(0, 0, 0), x_dir=(-1, 0, 0), z_dir=(0, 0, -1))):
        with Locations((122, -4.5)):
            Rectangle(SKETCH33_W, SKETCH33_H)
        with Locations((-122, -6.5)):
            Rectangle(SKETCH33_W, SKETCH33_H_2)
    extrude(amount=-BOSS_EXTRUDE6_DEPTH)

    # Sketch34 → Cut-Extrude27 (cut)
    with BuildSketch(Plane(origin=(0, 0, 0), x_dir=(-1, 0, 0), z_dir=(0, 0, -1))):
        with Locations((113.98, -48)):
            Circle(SKETCH34_R)
        with Locations((69.98, -48)):
            Circle(SKETCH34_R)
    extrude(amount=-CUT_EXTRUDE27_DEPTH, mode=Mode.SUBTRACT)

    # Sketch35 → Cut-Extrude28 (cut)
    with BuildSketch(Plane(origin=(0, 0, 0), x_dir=(-1, 0, 0), z_dir=(0, 0, -1))):
        Polygon((-120, 14.405611853), (-115, 14.405611853), (-115, 15.905611853), (-111.8, 15.905611853), (-111.8, 14.405611853), (-109.705118332, 14.405611853), (-109.705118332, 10.405611853), (-111.8, 10.405611853), (-111.8, 8.905611853), (-115, 8.905611853), (-115, 10.405611853), (-120, 10.405611853), align=None)
        Polygon((100, -24.37851787), (111.7, -24.37851787), (111.7, -22.87851787), (115, -22.87851787), (115, -24.37851787), (120, -24.37851787), (120, -28.77851787), (115, -28.77851787), (115, -30.27851787), (111.7, -30.27851787), (111.7, -28.77851787), (100, -28.77851787), align=None)
    extrude(amount=-CUT_EXTRUDE28_DEPTH, mode=Mode.SUBTRACT)

    # Sketch36 → Cut-Extrude29 (cut)
    with BuildSketch(Plane(origin=(0, 0, 0), x_dir=(-1, 0, 0), z_dir=(0, 0, -1))):
        with Locations((-22.5, 65.3)):
            Circle(SKETCH36_R)
    extrude(amount=-CUT_EXTRUDE29_DEPTH, mode=Mode.SUBTRACT)

    # Sketch37 → Cut-Extrude30 (cut)
    with BuildSketch(Plane(origin=(0, 0, 0), x_dir=(-1, 0, 0), z_dir=(0, 0, -1))):
        with Locations((-79.8, 13.2)):
            Circle(SKETCH37_R)
    extrude(amount=-CUT_EXTRUDE30_DEPTH, mode=Mode.SUBTRACT)

    # Sketch38 → Cut-Extrude31 (cut)
    with BuildSketch(Plane(origin=(0, 0, 0), x_dir=(-1, 0, 0), z_dir=(0, 0, -1))):
        with Locations((83.2, 38)):
            Circle(SKETCH38_R)
    extrude(amount=-CUT_EXTRUDE31_DEPTH, mode=Mode.SUBTRACT)

    # Sketch39 → Cut-Extrude32 (cut)
    with BuildSketch(Plane(origin=(0, 0, 0), x_dir=(-1, 0, 0), z_dir=(0, 0, -1))):
        with BuildLine():
            Line((68.144700817, 60.273962469), (68.144700817, 50.273962469))
            ThreePointArc((68.144700817, 50.273962469), (65.644700817, 47.773962469), (63.144700817, 50.273962469))
            Line((63.144700817, 50.273962469), (63.144700817, 60.273962469))
            ThreePointArc((63.144700817, 60.273962469), (65.644700817, 62.773962469), (68.144700817, 60.273962469))
        make_face()
    extrude(amount=-CUT_EXTRUDE32_DEPTH, mode=Mode.SUBTRACT)

    # Fillet2
    fillet2_edges = [part.edges().sort_by_distance(p)[0] for p in [
        (-90, 75.5, 2),
    ]]
    fillet(fillet2_edges, radius=FILLET2_R)

    # Sketch41 → Boss-Extrude7 (add)
    with BuildSketch(Plane(origin=(0, 0, 0), x_dir=(-1, 0, 0), z_dir=(0, 0, -1))):
        with Locations((-91.621883277, 77.367881047)):
            Circle(SKETCH41_R)
        with Locations((-91.621883277, 77.367881047)):
            Circle(SKETCH41_R_2, mode=Mode.SUBTRACT)
    extrude(amount=-BOSS_EXTRUDE7_DEPTH)

    # Fillet3
    # the kernel refuses this fillet: 10 mm, written as the material it adds along each edge
    with BuildSketch(Plane(origin=(86.983885822, 75.5, 4), x_dir=(0.05276655302532394, 0.998606875042339, 0), z_dir=(0, 0, -1))) as fillet3_piece_1:
        with BuildLine():
            CenterArc((8.440039974, -9.065949002), FILLET3_R, 114.961046701, 34.971313941)
            Line((-0.214305383, -4.055728803), (-0.38739229, -3.955524399))
            ThreePointArc((-0.38739229, -3.955524399), (-0.306874067, -2.017311091), (-0.199721375, 0.010553311))
            Line((-0.199721375, 0.010553311), (0.0844004, 0.18131898))
            ThreePointArc((0.0844004, 0.18131898), (2.110009993, -0.267025499), (4.135619587, 0.18131898))
            Line((4.135619587, 0.18131898), (4.220019987, 0))
        make_face()
    extrude(amount=4)
    with BuildSketch(Plane(origin=(90, 72.638241035, 4), x_dir=(0, -1, 0), z_dir=(0, 0, -1))) as fillet3_piece_2:
        with BuildLine():
            CenterArc((7.712512543, -10), FILLET3_R, 90, 56.045033959)
            Line((-0.582255827, -4.414588851), (-0.748151194, -4.302880628))
            ThreePointArc((-0.748151194, -4.302880628), (0.029146738, -2.249536589), (-0.1891856, -0.064875331))
            Line((-0.1891856, -0.064875331), (0, 0.2))
            Line((0, 0.2), (7.712512543, 0.2))
            Line((7.712512543, 0.2), (7.712512543, 0))
        make_face()
    extrude(amount=4)

    # Sketch43 → Cut-Extrude34 (cut)
    with BuildSketch(Plane(origin=(0, 0, 0), x_dir=(-1, 0, 0), z_dir=(0, 0, -1))):
        with BuildLine():
            Line((27.5, 75.5), (27.5, 65.5))
            ThreePointArc((27.5, 65.5), (23.25, 61.25), (19, 65.5))
            Line((19, 65.5), (19, 75.5))
            ThreePointArc((19, 75.5), (23.25, 79.75), (27.5, 75.5))
        make_face()
        with BuildLine():
            Line((18.207954817, 24.148550424), (18.207954817, 39.148550424))
            ThreePointArc((18.207954817, 39.148550424), (23.25, 44.190595606), (28.292045182, 39.148550424))
            Line((28.292045182, 39.148550424), (28.292045182, 24.148550424))
            ThreePointArc((28.292045182, 24.148550424), (23.25, 19.106505241), (18.207954817, 24.148550424))
        make_face()
    extrude(amount=-CUT_EXTRUDE34_DEPTH, mode=Mode.SUBTRACT)

    # Fillet4
    fillet4_edges = [part.edges().sort_by_distance(p)[0] for p in [
        (-120, 40.5, 2),
    ]]
    fillet(fillet4_edges, radius=FILLET4_R)

    # Sketch44 → Cut-Extrude35 (cut)
    with BuildSketch(Plane(origin=(0, 0, 0), x_dir=(-1, 0, 0), z_dir=(0, 0, -1))):
        with Locations((-105, 33)):
            Rectangle(SKETCH44_W, SKETCH44_H)
    extrude(amount=-CUT_EXTRUDE35_DEPTH, mode=Mode.SUBTRACT)

    # Fillet5
    # the kernel refuses this fillet: 14 mm, written as the material it takes off along each edge
    with BuildSketch(Plane(origin=(120, 25.5, -34.237901126), x_dir=(-1, 0, 0), z_dir=(0, 0, 1))) as fillet5_piece_1:
        with BuildLine():
            CenterArc((13.69516045, 14), FILLET5_R, 191.978445727, 78.021554273)
            Line((0, 11.094388147), (-0.273903209, 11.03627591))
            ThreePointArc((-0.273903209, 11.03627591), (-0.28, 5.547194073), (-0.28, 0))
            Line((-0.28, 0), (0, -0.28))
            Line((0, -0.28), (13.69516045, -0.28))
            Line((13.69516045, -0.28), (13.69516045, 0))
        make_face()
    extrude(amount=72.475802251, mode=Mode.SUBTRACT)

    # Sketch46 → Cut-Extrude37 (cut)
    with BuildSketch(Plane(origin=(0, 0, 0), x_dir=(-1, 0, 0), z_dir=(0, 0, -1))):
        with Locations((-34, -53.25)):
            Rectangle(SKETCH46_W, SKETCH46_H)
        with Locations((34, -53.25)):
            Rectangle(SKETCH46_W, SKETCH46_H)
    extrude(amount=-CUT_EXTRUDE37_DEPTH, mode=Mode.SUBTRACT)


solid = part.part
